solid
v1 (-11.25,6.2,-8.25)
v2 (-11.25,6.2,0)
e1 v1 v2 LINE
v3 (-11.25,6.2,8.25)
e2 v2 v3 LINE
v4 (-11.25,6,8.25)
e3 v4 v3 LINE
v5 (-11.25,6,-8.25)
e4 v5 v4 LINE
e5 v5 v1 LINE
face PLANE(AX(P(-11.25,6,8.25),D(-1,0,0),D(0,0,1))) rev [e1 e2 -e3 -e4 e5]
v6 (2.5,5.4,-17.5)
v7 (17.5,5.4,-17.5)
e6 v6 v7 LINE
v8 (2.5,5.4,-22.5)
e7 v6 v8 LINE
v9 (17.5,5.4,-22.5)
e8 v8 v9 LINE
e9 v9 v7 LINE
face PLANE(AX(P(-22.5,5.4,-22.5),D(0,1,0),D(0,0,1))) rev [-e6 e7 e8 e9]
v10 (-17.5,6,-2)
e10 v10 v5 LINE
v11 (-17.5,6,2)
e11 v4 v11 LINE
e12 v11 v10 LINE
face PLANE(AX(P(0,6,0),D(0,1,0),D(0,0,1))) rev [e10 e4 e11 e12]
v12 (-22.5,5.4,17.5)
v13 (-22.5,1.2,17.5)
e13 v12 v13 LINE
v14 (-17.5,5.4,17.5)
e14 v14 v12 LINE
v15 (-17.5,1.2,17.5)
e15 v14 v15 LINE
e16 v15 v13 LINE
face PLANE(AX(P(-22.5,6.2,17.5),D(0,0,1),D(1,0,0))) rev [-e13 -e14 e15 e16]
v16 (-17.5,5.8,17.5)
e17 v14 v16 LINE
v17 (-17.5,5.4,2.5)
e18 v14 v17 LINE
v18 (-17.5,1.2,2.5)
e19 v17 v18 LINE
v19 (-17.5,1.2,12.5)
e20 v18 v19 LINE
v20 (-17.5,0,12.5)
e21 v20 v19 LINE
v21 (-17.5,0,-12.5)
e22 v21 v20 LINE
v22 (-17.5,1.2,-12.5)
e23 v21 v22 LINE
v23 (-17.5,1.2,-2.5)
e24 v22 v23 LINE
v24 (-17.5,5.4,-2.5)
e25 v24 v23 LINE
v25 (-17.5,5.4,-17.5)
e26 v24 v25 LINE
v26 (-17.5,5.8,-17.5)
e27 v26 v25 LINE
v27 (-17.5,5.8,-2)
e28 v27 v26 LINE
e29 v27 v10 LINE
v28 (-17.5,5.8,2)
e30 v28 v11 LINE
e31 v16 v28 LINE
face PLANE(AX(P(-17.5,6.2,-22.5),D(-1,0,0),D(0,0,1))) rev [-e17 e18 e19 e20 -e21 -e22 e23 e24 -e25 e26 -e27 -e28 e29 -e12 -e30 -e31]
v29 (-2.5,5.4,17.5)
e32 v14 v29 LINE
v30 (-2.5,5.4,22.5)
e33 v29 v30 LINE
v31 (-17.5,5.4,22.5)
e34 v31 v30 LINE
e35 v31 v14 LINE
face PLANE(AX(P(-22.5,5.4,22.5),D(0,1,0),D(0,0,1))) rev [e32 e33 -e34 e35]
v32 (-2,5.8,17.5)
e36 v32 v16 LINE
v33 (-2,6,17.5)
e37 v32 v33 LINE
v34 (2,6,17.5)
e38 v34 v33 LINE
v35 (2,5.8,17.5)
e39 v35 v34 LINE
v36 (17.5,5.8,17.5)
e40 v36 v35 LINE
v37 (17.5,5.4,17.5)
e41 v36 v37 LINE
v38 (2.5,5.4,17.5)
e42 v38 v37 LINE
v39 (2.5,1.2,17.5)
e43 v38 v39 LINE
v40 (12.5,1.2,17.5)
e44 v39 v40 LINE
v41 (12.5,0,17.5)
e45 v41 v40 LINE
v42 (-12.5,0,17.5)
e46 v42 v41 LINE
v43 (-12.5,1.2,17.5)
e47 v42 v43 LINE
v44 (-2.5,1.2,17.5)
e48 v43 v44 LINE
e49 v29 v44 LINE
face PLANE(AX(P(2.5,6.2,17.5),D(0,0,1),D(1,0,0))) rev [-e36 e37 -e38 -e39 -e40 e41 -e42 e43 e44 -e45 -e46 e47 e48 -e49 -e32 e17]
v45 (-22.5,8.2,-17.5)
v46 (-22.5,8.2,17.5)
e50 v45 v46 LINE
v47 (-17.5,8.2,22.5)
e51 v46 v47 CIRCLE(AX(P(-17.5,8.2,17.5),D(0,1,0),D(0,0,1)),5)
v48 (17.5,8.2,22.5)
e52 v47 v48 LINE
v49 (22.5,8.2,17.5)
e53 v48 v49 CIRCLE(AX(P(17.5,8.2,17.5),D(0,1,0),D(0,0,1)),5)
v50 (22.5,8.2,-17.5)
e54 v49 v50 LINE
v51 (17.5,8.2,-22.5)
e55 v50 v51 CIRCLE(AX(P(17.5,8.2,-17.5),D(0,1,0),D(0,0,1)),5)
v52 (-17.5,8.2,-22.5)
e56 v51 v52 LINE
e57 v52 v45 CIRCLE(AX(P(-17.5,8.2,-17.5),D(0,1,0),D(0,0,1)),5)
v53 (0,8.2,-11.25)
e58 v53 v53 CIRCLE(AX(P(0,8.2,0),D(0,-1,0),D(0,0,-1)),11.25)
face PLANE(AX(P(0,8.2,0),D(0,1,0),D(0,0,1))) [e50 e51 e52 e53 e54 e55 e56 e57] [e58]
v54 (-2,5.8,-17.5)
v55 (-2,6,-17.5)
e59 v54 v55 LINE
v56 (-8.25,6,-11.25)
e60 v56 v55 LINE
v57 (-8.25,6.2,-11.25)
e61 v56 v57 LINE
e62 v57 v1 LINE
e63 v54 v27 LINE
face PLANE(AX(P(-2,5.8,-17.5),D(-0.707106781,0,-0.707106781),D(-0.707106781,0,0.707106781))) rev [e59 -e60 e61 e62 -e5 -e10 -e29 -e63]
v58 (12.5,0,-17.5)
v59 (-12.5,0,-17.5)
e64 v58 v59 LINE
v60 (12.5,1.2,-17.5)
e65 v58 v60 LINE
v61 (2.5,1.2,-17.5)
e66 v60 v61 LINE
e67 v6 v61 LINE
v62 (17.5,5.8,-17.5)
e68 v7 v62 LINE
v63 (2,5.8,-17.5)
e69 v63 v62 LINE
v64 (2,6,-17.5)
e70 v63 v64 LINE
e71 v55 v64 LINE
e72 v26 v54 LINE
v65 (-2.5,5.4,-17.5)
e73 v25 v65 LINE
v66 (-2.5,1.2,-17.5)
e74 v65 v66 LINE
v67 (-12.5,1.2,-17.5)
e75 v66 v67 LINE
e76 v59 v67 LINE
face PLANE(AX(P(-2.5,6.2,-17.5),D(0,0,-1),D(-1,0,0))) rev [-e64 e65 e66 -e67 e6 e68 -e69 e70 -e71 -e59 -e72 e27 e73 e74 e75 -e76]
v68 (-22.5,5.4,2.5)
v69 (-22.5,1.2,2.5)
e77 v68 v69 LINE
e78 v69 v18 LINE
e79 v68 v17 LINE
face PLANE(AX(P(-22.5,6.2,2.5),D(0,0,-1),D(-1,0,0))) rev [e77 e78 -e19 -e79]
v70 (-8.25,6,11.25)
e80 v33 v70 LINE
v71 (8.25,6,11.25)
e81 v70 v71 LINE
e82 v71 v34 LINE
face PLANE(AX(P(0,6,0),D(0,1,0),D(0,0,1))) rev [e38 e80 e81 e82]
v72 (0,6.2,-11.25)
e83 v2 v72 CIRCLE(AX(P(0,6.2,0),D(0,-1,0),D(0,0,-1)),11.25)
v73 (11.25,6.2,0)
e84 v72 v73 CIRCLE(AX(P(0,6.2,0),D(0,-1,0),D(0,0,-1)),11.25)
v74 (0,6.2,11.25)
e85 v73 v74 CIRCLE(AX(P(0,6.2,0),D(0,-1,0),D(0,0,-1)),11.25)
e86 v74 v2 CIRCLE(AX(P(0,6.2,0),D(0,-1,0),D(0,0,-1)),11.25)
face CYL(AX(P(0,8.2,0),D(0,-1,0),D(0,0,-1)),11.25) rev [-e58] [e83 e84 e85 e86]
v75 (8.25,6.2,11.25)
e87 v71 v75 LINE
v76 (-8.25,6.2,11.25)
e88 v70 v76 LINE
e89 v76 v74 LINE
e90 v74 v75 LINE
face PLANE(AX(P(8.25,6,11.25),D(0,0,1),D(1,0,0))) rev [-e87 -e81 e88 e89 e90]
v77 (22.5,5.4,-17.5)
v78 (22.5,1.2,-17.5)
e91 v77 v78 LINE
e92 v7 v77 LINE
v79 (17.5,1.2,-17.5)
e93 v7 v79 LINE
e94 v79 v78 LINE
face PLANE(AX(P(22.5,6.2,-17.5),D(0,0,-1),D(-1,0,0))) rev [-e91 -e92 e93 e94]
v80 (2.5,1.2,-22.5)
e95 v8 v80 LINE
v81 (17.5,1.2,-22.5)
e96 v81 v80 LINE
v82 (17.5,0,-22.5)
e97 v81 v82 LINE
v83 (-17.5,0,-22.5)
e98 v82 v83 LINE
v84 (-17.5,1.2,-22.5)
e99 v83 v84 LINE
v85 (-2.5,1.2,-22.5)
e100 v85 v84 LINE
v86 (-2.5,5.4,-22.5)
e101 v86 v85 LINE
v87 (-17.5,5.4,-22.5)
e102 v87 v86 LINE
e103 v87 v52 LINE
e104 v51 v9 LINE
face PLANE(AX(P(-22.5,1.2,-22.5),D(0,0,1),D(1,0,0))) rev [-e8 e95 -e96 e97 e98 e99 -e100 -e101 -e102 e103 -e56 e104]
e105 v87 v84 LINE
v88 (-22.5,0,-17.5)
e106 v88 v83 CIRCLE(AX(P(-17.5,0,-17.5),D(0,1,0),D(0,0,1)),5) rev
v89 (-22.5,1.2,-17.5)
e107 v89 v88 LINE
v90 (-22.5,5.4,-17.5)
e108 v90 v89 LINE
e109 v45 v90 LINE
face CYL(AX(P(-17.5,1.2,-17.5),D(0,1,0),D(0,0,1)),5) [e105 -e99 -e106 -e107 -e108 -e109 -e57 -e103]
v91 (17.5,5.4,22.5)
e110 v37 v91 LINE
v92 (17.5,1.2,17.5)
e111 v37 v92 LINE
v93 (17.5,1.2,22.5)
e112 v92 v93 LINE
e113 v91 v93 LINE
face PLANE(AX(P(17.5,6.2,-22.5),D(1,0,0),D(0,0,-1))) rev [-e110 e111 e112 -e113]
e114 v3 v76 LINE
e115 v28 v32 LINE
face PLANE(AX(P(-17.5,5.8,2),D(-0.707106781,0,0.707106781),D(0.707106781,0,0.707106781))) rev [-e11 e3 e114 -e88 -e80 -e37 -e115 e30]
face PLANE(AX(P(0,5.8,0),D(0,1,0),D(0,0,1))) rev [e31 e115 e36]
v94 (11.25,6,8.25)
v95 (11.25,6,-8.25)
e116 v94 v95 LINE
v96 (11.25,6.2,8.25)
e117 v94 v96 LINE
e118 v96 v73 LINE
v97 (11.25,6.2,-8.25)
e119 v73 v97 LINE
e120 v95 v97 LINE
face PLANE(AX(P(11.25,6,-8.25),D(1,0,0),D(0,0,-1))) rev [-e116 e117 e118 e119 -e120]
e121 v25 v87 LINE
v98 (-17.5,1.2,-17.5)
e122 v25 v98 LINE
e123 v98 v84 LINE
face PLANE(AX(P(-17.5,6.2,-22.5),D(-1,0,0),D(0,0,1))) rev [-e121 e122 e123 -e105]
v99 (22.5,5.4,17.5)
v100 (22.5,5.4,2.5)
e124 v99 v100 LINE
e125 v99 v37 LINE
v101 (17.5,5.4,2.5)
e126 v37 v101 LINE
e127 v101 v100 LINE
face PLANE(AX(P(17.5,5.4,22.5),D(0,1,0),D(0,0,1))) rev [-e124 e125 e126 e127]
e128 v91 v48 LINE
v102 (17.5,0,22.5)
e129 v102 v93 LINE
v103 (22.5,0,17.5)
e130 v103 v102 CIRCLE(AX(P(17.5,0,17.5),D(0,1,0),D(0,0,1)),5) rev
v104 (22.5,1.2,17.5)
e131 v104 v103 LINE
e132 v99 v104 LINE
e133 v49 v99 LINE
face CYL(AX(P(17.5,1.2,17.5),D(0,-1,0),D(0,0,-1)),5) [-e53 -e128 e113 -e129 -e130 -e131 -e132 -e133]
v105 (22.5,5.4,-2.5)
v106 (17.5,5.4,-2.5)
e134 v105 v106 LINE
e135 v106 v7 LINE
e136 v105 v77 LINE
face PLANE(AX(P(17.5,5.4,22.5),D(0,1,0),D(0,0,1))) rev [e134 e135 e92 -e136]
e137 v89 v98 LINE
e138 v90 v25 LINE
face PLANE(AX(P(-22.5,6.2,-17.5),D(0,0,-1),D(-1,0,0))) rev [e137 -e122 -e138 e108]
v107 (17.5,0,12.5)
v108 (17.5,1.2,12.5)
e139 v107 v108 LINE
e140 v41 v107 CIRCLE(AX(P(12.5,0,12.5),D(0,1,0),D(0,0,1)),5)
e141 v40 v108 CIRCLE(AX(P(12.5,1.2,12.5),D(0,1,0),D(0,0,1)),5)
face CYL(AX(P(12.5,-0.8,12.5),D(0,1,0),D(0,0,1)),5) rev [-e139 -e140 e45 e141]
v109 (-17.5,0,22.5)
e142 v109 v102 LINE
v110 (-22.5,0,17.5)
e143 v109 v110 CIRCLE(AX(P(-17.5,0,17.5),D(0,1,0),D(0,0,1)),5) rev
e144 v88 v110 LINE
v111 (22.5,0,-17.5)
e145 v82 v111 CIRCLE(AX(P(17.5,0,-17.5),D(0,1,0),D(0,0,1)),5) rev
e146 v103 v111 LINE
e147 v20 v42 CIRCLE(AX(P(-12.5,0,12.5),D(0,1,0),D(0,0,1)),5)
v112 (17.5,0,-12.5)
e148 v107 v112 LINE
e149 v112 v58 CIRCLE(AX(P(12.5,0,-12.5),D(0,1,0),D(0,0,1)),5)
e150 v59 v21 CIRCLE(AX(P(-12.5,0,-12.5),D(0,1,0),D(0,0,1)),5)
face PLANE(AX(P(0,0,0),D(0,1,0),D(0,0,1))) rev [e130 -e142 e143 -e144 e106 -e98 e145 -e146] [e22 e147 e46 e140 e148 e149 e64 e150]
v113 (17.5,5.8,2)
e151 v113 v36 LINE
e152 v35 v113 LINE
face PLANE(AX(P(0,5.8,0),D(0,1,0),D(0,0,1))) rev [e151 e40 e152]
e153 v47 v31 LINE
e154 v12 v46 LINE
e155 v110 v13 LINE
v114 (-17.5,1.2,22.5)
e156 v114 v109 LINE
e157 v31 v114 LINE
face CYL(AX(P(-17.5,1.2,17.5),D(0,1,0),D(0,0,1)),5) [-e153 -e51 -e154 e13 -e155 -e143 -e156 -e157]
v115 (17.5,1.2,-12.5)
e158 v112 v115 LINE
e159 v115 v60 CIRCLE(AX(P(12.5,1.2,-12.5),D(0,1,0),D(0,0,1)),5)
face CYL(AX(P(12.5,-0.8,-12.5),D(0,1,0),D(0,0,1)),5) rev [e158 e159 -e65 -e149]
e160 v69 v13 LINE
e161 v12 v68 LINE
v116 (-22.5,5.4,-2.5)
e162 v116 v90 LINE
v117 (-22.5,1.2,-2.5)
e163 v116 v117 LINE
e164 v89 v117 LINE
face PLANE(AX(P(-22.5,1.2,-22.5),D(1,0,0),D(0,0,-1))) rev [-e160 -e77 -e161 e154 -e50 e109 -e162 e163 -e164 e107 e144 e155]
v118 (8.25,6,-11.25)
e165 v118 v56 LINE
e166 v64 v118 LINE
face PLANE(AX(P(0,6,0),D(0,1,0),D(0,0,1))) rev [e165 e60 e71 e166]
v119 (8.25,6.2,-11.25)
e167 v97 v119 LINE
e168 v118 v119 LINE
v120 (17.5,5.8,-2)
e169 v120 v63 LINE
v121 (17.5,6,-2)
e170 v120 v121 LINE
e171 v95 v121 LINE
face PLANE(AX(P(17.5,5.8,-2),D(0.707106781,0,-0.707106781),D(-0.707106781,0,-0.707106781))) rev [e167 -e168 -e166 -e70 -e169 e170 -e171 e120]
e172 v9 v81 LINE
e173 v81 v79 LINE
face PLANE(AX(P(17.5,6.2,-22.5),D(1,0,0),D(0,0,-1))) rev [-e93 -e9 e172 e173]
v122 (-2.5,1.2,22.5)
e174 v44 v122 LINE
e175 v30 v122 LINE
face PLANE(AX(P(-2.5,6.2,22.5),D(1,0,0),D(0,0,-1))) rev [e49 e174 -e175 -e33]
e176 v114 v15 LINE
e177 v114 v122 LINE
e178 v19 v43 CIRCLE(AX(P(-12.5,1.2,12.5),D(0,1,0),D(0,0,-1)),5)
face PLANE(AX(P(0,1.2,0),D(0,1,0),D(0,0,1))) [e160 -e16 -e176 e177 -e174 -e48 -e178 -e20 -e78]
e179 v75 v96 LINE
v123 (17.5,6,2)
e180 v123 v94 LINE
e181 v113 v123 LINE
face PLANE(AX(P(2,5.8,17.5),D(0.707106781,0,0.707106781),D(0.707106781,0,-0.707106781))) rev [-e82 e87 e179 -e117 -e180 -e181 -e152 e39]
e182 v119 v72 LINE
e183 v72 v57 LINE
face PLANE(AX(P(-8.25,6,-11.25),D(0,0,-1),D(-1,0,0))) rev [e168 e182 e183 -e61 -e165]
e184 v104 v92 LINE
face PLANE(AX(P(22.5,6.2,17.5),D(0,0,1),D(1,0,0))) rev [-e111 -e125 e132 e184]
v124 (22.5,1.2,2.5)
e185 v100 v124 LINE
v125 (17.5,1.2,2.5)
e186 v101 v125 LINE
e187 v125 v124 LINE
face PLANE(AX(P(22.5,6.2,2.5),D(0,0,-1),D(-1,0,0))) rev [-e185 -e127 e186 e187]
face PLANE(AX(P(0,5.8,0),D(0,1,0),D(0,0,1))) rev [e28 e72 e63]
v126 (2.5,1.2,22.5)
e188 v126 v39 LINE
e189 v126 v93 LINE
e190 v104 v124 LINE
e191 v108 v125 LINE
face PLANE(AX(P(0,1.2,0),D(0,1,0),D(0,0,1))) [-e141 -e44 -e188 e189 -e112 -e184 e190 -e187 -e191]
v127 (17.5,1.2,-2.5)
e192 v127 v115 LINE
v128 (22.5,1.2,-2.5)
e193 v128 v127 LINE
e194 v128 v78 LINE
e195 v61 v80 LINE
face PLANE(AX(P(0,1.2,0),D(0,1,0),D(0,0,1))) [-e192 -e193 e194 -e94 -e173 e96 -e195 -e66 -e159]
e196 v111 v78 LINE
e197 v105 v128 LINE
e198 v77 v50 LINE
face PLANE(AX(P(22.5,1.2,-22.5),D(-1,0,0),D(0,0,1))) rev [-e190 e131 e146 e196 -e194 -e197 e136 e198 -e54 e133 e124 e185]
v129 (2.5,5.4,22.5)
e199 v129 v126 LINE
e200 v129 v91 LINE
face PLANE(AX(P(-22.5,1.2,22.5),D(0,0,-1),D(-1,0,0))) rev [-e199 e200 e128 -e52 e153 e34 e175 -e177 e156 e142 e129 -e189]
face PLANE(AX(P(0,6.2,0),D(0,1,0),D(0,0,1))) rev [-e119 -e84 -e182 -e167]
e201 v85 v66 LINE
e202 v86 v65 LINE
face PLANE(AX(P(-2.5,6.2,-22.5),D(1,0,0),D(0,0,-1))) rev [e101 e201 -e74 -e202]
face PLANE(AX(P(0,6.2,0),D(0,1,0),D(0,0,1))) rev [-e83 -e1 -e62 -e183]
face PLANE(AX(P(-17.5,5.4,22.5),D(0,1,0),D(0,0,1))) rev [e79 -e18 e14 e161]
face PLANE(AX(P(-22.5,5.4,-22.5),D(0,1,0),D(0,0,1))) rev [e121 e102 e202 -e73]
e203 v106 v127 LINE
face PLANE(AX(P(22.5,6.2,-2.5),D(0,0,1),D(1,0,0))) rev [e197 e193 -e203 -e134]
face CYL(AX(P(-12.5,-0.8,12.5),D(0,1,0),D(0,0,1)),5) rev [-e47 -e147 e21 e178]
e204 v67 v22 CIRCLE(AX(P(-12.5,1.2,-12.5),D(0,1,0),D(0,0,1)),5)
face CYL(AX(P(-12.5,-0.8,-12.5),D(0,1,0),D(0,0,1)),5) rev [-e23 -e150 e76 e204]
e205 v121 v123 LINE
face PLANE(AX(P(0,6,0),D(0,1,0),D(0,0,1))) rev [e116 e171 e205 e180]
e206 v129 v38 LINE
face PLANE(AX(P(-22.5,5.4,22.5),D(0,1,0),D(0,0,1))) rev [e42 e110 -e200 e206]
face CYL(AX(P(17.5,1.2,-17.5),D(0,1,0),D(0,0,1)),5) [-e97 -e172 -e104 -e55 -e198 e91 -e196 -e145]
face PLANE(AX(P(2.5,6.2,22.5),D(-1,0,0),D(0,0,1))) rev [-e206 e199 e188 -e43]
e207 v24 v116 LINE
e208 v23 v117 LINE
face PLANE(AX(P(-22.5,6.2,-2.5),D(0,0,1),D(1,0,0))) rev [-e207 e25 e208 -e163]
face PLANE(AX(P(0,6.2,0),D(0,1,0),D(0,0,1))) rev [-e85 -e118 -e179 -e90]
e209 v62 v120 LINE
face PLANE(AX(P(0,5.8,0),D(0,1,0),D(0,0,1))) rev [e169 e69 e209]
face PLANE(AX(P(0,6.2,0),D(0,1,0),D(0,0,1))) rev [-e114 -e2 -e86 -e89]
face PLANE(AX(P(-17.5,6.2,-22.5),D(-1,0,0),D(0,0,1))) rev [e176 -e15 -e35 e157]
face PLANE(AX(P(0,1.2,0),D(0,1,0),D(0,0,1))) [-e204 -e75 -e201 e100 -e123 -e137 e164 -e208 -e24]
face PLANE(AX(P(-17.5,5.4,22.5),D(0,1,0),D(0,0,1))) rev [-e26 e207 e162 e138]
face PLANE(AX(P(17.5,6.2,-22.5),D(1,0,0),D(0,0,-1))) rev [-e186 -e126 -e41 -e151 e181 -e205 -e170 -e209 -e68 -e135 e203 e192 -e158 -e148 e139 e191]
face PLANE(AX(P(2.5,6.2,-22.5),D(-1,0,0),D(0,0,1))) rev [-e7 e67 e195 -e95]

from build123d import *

# Parameters (mm, degrees)
ESBO_O1_W                = 45
ESBO_O1_H                = 45
BASE_DEPTH               = 1.2
ESBO_O2_W                = 5
ESBO_O2_H                = 5
PAREDES_DEPTH            = 5
ESBO_O3_W                = 45
ESBO_O3_H                = 45
TELHADO_DEPTH            = 2
CORTE_DA_BASE_DEPTH      = 2
ESBO_O5_R                = 11.25
CORTE_DO_C_RCULO_DEPTH   = 2
PONTE_1_REACH            = 48.621
ESBO_O6_W                = 5
ESBO_O6_H                = 0.8
PONTE_2_REACH            = 48.621
ESBO_O7_W                = 5
ESBO_O7_H                = 0.8
RESSALTO_EXTRUS_O6_DEPTH = 0.4
RESSALTO_EXTRUS_O7_DEPTH = 0.2
FILETE1_R                = 5
FILETE2_R                = 5
FILETE3_R                = 5
FILETE4_R                = 5


with BuildPart() as part:
    # Esboço1 → Base (new body)
    with BuildSketch(Plane(origin=(0, 0, 0), x_dir=(1, 0, 0), z_dir=(0, 1, 0))):
        Rectangle(ESBO_O1_W, ESBO_O1_H)
    extrude(amount=BASE_DEPTH)

    # Esboço2 → Paredes (add)
    with BuildSketch(Plane(origin=(0, 1.2, 0), x_dir=(1, 0, 0), z_dir=(0, 1, 0))):
        with Locations((-20, 20)):
            Rectangle(ESBO_O2_W, ESBO_O2_H)
        with Locations((20, 20)):
            Rectangle(ESBO_O2_W, ESBO_O2_H)
        with Locations((20, -20)):
            Rectangle(ESBO_O2_W, ESBO_O2_H)
        with Locations((-20, -20)):
            Rectangle(ESBO_O2_W, ESBO_O2_H)
        with Locations((0, 20)):
            Rectangle(ESBO_O2_W, ESBO_O2_H)
        with Locations((-20, 0)):
            Rectangle(ESBO_O2_W, ESBO_O2_H)
        with Locations((20, 0)):
            Rectangle(ESBO_O2_W, ESBO_O2_H)
        with Locations((0, -20)):
            Rectangle(ESBO_O2_W, ESBO_O2_H)
    extrude(amount=PAREDES_DEPTH)

    # Esboço3 → Telhado (add)
    with BuildSketch(Plane(origin=(0, 6.2, 0), x_dir=(1, 0, 0), z_dir=(0, 1, 0))):
        Rectangle(ESBO_O3_W, ESBO_O3_H)
    extrude(amount=TELHADO_DEPTH)

    # Esboço4 → Corte da Base (cut)
    with BuildSketch(Plane(origin=(0, 1.2, 0), x_dir=(1, 0, 0), z_dir=(0, 1, 0))):
        with BuildLine():
            Line((-12.5, 17.5), (12.5, 17.5))
            ThreePointArc((12.5, 17.5), (16.035533906, 16.035533906), (17.5, 12.5))
            Line((17.5, 12.5), (17.5, -12.5))
            ThreePointArc((17.5, -12.5), (16.035533906, -16.035533906), (12.5, -17.5))
            Line((12.5, -17.5), (-12.5, -17.5))
            ThreePointArc((-12.5, -17.5), (-16.035533906, -16.035533906), (-17.5, -12.5))
            Line((-17.5, -12.5), (-17.5, 12.5))
            ThreePointArc((-17.5, 12.5), (-16.035533906, 16.035533906), (-12.5, 17.5))
        make_face()
    extrude(amount=-CORTE_DA_BASE_DEPTH, mode=Mode.SUBTRACT)

    # Esboço5 → Corte do Círculo (cut)
    with BuildSketch(Plane.XZ.offset(-6.2)):
        with Locations(Location((0, 0, 0), (0, 0, 270))):
            Circle(ESBO_O5_R)
    extrude(amount=-CORTE_DO_C_RCULO_DEPTH, mode=Mode.SUBTRACT)

    # Esboço6 → Ponte 1 (add, up to next)
    with BuildSketch(Plane.XY.offset(-17.5), mode=Mode.PRIVATE) as ponte_1_sk1:
        with Locations((20, 5.8)):
            Rectangle(ESBO_O6_W, ESBO_O6_H)
    ponte_1_tool1 = extrude(ponte_1_sk1.sketch, amount=PONTE_1_REACH, mode=Mode.PRIVATE) - part.part
    # Esboço6 → Ponte 1 (add, up to next)
    with BuildSketch(Plane.XY.offset(-17.5), mode=Mode.PRIVATE) as ponte_1_sk2:
        with Locations((-20, 5.8)):
            Rectangle(ESBO_O6_W, ESBO_O6_H)
    ponte_1_tool2 = extrude(ponte_1_sk2.sketch, amount=PONTE_1_REACH, mode=Mode.PRIVATE) - part.part
    add(ponte_1_tool1.solids().sort_by_distance((20, 5.8, -17.5))[0])
    add(ponte_1_tool1.solids().sort_by_distance((20, 5.8, -17.5))[1])
    add(ponte_1_tool2.solids().sort_by_distance((-20, 5.8, -17.5))[0])
    add(ponte_1_tool2.solids().sort_by_distance((-20, 5.8, -17.5))[1])

    # Esboço7 → Ponte 2 (add, up to next)
    with BuildSketch(Plane.ZY.offset(-17.5), mode=Mode.PRIVATE) as ponte_2_sk1:
        with Locations((20, 5.8)):
            Rectangle(ESBO_O7_W, ESBO_O7_H)
    ponte_2_tool1 = extrude(ponte_2_sk1.sketch, amount=PONTE_2_REACH, mode=Mode.PRIVATE) - part.part
    # Esboço7 → Ponte 2 (add, up to next)
    with BuildSketch(Plane.ZY.offset(-17.5), mode=Mode.PRIVATE) as ponte_2_sk2:
        with Locations((-20, 5.8)):
            Rectangle(ESBO_O7_W, ESBO_O7_H)
    ponte_2_tool2 = extrude(ponte_2_sk2.sketch, amount=PONTE_2_REACH, mode=Mode.PRIVATE) - part.part
    add(ponte_2_tool1.solids().sort_by_distance((17.5, 5.8, 20))[0])
    add(ponte_2_tool1.solids().sort_by_distance((17.5, 5.8, 20))[1])
    add(ponte_2_tool2.solids().sort_by_distance((17.5, 5.8, -20))[0])
    add(ponte_2_tool2.solids().sort_by_distance((17.5, 5.8, -20))[1])

    # Esboço8 → Ressalto-extrusão6 (add)
    with BuildSketch(Plane(origin=(0, 6.2, 0), x_dir=(-1, 0, 0), z_dir=(0, -1, 0))):
        Polygon((-2, -17.5), (-17.5, -2), (-17.5, -17.5), align=None)
        Polygon((-17.5, 2), (-17.5, 17.5), (-2, 17.5), align=None)
        Polygon((2, 17.5), (17.5, 17.5), (17.5, 2), align=None)
        Polygon((17.5, -2), (17.5, -17.5), (2, -17.5), align=None)
    extrude(amount=RESSALTO_EXTRUS_O6_DEPTH)

    # Esboço10 → Ressalto-extrusão7 (add)
    with BuildSketch(Plane.XZ.offset(-6.2)):
        Polygon((-11.25, 8.25), (-11.25, -8.25), (-17.5, -2), (-17.5, 2), align=None)
        Polygon((8.25, 11.25), (2, 17.5), (-2, 17.5), (-8.25, 11.25), align=None)
        Polygon((11.25, -8.25), (17.5, -2), (17.5, 2), (11.25, 8.25), align=None)
        Polygon((-8.25, -11.25), (-2, -17.5), (2, -17.5), (8.25, -11.25), align=None)
    extrude(amount=RESSALTO_EXTRUS_O7_DEPTH)

    # Filete1
    filete1_edges = [part.edges().sort_by_distance(p)[0] for p in [
        (-22.5, 4.1, -22.5),
    ]]
    fillet(filete1_edges, radius=FILETE1_R - 0.0001)  # a hair under: the kernel refuses the full size

    # Filete2
    filete2_edges = [part.edges().sort_by_distance(p)[0] for p in [
        (-22.5, 4.1, 22.5),
    ]]
    fillet(filete2_edges, radius=FILETE2_R - 0.0001)  # a hair under: the kernel refuses the full size

    # Filete3
    filete3_edges = [part.edges().sort_by_distance(p)[0] for p in [
        (22.5, 4.1, 22.5),
    ]]
    fillet(filete3_edges, radius=FILETE3_R - 0.0001)  # a hair under: the kernel refuses the full size

    # Filete4
    filete4_edges = [part.edges().sort_by_distance(p)[0] for p in [
        (22.5, 4.1, -22.5),
    ]]
    fillet(filete4_edges, radius=FILETE4_R - 0.0001)  # a hair under: the kernel refuses the full size


solid = part.part
